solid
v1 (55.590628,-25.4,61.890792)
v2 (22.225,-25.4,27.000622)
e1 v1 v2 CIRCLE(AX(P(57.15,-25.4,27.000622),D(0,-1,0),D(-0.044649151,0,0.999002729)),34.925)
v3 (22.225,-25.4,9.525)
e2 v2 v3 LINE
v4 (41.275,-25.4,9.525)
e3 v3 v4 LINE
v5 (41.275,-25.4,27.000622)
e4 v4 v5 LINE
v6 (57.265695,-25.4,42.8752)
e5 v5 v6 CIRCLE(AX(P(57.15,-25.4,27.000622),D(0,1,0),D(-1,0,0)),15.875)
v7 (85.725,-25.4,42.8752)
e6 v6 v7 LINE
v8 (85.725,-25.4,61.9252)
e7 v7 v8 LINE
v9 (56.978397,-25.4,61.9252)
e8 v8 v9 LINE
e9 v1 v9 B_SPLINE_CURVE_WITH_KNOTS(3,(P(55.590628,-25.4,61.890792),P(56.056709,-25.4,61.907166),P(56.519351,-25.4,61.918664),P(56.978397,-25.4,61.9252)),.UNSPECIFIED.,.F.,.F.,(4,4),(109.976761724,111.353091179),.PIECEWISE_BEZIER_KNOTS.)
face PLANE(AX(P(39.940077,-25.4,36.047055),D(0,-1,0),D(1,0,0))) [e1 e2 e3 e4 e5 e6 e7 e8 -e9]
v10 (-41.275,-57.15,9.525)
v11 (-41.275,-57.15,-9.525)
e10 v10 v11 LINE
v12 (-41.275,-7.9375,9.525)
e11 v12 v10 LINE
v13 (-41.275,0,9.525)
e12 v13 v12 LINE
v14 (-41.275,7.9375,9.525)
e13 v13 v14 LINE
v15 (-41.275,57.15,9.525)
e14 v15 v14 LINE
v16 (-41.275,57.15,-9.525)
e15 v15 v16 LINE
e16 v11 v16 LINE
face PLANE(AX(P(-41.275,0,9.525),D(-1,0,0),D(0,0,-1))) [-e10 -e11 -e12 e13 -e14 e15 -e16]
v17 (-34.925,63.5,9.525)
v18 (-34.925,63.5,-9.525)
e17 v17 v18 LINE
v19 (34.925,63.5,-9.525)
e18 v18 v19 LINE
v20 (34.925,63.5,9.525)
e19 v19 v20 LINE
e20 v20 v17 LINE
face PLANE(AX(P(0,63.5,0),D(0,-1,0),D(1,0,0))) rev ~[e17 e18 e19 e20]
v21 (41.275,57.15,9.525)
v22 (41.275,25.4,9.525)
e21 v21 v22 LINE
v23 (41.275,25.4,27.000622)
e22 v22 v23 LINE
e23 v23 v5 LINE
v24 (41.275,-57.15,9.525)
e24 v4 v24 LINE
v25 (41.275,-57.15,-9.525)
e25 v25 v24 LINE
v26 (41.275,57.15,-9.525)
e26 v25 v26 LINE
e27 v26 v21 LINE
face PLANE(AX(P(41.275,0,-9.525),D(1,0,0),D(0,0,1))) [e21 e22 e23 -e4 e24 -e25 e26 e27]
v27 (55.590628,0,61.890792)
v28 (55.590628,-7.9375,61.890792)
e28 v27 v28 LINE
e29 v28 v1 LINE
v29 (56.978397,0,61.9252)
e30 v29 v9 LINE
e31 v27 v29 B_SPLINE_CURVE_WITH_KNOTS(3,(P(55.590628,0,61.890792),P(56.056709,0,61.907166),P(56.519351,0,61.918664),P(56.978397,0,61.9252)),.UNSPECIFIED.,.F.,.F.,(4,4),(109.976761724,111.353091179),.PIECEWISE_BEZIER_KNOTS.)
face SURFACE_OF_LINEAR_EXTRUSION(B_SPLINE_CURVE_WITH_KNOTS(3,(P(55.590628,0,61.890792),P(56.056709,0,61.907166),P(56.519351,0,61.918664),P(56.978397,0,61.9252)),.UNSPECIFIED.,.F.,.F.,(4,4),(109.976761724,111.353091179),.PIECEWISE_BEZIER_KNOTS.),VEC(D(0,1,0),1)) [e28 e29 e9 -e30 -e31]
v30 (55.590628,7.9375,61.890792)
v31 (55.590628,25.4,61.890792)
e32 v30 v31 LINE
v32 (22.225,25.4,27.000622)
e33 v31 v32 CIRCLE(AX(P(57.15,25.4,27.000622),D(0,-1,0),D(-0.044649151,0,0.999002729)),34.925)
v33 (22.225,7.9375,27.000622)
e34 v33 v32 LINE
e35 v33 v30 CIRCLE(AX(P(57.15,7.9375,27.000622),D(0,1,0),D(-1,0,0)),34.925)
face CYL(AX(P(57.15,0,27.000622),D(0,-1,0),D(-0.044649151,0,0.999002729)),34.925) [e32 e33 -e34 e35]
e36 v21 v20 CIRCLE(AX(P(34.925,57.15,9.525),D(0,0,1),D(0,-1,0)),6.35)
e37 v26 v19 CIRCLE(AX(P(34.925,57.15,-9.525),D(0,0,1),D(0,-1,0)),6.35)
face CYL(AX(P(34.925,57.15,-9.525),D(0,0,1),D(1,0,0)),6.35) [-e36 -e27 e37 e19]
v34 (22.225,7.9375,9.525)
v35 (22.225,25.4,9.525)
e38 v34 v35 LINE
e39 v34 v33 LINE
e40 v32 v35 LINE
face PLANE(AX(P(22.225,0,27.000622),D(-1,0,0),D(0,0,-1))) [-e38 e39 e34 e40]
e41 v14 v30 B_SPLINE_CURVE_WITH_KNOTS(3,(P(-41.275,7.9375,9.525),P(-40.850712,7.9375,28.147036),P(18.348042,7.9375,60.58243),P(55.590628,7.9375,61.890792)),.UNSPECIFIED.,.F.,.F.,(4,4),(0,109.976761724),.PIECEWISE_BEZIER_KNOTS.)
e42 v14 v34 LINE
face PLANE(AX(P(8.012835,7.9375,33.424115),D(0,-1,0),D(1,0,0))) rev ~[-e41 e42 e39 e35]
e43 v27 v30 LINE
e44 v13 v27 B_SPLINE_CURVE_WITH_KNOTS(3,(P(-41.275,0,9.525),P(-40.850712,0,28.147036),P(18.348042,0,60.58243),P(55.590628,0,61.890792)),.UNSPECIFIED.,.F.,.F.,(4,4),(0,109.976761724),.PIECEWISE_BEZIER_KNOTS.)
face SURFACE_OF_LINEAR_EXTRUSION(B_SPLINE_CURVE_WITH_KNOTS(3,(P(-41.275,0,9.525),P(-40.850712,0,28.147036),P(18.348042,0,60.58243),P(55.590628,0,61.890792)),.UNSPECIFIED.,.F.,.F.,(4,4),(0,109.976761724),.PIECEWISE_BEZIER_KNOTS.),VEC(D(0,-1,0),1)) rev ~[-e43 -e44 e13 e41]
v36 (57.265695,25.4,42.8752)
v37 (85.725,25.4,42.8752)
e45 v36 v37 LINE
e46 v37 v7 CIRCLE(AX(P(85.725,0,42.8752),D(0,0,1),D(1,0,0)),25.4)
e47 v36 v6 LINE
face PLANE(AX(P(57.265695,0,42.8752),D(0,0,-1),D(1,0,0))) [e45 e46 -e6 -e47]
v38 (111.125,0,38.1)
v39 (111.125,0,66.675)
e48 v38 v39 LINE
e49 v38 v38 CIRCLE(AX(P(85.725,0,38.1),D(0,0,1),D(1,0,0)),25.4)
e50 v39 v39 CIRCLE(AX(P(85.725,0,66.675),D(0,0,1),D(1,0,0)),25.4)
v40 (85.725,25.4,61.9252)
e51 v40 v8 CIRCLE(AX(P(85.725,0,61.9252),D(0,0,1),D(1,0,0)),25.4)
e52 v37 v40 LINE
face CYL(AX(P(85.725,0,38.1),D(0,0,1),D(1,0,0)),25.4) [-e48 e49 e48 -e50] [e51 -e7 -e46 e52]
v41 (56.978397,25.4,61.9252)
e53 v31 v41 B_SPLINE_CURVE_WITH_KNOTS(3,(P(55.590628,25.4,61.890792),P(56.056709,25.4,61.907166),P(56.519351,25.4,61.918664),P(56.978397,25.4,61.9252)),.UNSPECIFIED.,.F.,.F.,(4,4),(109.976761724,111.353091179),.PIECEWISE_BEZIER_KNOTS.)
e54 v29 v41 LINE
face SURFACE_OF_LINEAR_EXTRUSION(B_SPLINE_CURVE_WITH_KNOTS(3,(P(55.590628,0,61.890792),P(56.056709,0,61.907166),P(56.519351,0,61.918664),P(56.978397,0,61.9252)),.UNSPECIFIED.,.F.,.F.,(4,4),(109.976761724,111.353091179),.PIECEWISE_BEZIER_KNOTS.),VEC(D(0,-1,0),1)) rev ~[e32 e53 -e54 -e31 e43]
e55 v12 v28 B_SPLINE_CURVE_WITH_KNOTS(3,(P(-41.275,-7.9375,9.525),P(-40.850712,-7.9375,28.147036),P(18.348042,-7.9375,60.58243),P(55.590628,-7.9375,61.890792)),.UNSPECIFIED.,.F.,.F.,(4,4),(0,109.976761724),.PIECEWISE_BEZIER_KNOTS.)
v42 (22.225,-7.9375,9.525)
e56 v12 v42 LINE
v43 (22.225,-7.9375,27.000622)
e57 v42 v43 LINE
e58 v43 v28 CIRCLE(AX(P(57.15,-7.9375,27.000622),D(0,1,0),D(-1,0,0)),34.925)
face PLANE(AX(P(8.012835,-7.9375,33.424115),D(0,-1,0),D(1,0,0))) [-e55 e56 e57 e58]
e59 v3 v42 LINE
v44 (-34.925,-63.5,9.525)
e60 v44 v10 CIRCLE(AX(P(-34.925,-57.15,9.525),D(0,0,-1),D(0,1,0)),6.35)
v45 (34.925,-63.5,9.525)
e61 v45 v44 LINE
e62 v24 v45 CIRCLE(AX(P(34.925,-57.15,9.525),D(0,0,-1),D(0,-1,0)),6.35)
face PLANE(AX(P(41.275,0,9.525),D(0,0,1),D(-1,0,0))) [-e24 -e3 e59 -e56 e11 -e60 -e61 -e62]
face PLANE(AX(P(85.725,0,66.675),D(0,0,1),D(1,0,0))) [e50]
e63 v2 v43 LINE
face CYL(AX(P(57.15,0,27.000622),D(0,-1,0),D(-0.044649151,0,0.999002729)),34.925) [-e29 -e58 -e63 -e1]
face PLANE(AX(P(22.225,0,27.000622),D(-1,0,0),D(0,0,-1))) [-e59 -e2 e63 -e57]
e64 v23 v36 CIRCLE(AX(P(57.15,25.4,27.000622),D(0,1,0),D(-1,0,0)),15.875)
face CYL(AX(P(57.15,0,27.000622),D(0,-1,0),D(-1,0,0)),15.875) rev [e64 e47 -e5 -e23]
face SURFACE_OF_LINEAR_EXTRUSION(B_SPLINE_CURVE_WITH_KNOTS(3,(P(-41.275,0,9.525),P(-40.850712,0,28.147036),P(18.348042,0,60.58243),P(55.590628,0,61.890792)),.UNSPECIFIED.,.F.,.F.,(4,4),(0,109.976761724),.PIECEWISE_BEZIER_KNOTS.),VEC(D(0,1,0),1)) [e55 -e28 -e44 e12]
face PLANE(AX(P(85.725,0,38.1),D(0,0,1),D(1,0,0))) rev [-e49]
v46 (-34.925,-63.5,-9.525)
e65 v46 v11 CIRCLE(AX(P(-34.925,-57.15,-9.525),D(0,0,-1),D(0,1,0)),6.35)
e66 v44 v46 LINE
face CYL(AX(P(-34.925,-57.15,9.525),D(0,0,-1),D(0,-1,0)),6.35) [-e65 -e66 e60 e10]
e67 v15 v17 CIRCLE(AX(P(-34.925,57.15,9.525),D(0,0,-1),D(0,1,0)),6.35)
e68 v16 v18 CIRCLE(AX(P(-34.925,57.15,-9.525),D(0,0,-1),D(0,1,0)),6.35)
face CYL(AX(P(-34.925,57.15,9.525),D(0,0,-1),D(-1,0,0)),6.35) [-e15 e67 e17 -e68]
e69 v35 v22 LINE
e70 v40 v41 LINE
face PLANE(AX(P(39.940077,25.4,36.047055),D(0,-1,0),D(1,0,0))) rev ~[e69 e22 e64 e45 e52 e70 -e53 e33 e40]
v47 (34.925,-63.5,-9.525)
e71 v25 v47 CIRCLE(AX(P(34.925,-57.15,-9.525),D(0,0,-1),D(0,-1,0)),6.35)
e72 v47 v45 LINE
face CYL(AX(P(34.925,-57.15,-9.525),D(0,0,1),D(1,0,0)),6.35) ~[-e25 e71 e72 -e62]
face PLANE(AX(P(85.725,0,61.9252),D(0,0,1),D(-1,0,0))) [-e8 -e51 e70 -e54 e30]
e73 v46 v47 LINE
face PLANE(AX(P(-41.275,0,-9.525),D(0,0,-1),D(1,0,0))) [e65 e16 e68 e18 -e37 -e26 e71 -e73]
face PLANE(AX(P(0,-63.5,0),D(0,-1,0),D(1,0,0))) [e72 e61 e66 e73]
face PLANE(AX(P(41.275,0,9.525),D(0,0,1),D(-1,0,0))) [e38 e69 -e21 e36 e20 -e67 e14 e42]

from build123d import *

# Parameters (mm, degrees)
F1_DEPTH = 63.5
F0_W     = 25.4
F0_H     = 19.05
F2_DEPTH = 25.4
F3_DEPTH = 7.9375
F5_R     = 6.35


# Not quite as in the source:
# - a feature names something its author has since deleted; it is built from what else it names


with BuildPart() as f1:
    # F0 (on Front) → F1 (new body, symmetric)
    with BuildSketch(Plane.XZ):
        Polygon((41.275, -9.525), (41.275, 9.525), (22.225, 9.525), (-41.275, 9.525), (-41.275, -9.525), align=None)
    extrude(amount=F1_DEPTH, both=True)

    # F0 (on Front) → F2 (join, symmetric)
    with BuildSketch(Plane.XZ):
        with BuildLine():
            Line((22.225, 9.525), (41.275, 9.525))
            Line((41.275, 9.525), (41.275, 27.0006215875))
            ThreePointArc((41.275, 27.0006215875), (45.9656588405, 38.2667716764), (57.2656945294, 42.8752))
            Line((57.2656945294, 42.8752), (60.325, 42.8752))
            Line((60.325, 42.8752), (60.325, 61.9252))
            Line((60.325, 61.9252), (56.9783966597, 61.9252))
            add(Edge.make_bspline(
                [(55.5906283852, 61.8907919104), (56.0567092962, 61.9071657032), (56.5193514661, 61.918664428), (56.9783966597, 61.9252)],
                knots=[109.9767617242, 109.9767617242, 109.9767617242, 109.9767617242, 111.3530911794, 111.3530911794, 111.3530911794, 111.3530911794], degree=3))
            ThreePointArc((55.5906283852, 61.8907919104), (31.9089948829, 51.1387094503), (22.225, 27.0006215875))
            Line((22.225, 27.0006215875), (22.225, 9.525))
        make_face()
        with Locations((73.025, 52.4002)):
            Rectangle(F0_W, F0_H)
    extrude(amount=F2_DEPTH, both=True)

    # F0 (on Front) → F3 (join, symmetric)
    with BuildSketch(Plane.XZ):
        with BuildLine():
            Line((-41.275, 9.525), (22.225, 9.525))
            Line((22.225, 9.525), (22.225, 27.0006215875))
            ThreePointArc((22.225, 27.0006215875), (31.9089948829, 51.1387094503), (55.5906283852, 61.8907919104))
            add(Edge.make_bspline(
                [(-41.275, 9.525), (-40.8507124628, 28.1470359497), (18.3480415197, 60.5824302397), (55.5906283852, 61.8907919104)],
                knots=[0, 0, 0, 0, 109.9767617242, 109.9767617242, 109.9767617242, 109.9767617242], degree=3))
        make_face()
    extrude(amount=F3_DEPTH, both=True)

    # F0 (on Front) → F4 (revolve)
    with BuildSketch(Plane.XZ):
        Polygon((85.725, 61.9252), (85.725, 42.8752), (85.725, 38.1), (111.125, 38.1), (111.125, 66.675), (85.725, 66.675), align=None)
    revolve(axis=Axis((85.725, 0, 52.3875), (0, 0, 1)))

    # F5
    f5_edges = [f1.edges().sort_by_distance(p)[0] for p in [
        (-41.275, -63.5, 0),
        (41.275, -63.5, 0),
        (41.275, 63.5, 0),
        (-41.275, 63.5, 0),
    ]]
    fillet(f5_edges, radius=F5_R)


solid = f1.part
